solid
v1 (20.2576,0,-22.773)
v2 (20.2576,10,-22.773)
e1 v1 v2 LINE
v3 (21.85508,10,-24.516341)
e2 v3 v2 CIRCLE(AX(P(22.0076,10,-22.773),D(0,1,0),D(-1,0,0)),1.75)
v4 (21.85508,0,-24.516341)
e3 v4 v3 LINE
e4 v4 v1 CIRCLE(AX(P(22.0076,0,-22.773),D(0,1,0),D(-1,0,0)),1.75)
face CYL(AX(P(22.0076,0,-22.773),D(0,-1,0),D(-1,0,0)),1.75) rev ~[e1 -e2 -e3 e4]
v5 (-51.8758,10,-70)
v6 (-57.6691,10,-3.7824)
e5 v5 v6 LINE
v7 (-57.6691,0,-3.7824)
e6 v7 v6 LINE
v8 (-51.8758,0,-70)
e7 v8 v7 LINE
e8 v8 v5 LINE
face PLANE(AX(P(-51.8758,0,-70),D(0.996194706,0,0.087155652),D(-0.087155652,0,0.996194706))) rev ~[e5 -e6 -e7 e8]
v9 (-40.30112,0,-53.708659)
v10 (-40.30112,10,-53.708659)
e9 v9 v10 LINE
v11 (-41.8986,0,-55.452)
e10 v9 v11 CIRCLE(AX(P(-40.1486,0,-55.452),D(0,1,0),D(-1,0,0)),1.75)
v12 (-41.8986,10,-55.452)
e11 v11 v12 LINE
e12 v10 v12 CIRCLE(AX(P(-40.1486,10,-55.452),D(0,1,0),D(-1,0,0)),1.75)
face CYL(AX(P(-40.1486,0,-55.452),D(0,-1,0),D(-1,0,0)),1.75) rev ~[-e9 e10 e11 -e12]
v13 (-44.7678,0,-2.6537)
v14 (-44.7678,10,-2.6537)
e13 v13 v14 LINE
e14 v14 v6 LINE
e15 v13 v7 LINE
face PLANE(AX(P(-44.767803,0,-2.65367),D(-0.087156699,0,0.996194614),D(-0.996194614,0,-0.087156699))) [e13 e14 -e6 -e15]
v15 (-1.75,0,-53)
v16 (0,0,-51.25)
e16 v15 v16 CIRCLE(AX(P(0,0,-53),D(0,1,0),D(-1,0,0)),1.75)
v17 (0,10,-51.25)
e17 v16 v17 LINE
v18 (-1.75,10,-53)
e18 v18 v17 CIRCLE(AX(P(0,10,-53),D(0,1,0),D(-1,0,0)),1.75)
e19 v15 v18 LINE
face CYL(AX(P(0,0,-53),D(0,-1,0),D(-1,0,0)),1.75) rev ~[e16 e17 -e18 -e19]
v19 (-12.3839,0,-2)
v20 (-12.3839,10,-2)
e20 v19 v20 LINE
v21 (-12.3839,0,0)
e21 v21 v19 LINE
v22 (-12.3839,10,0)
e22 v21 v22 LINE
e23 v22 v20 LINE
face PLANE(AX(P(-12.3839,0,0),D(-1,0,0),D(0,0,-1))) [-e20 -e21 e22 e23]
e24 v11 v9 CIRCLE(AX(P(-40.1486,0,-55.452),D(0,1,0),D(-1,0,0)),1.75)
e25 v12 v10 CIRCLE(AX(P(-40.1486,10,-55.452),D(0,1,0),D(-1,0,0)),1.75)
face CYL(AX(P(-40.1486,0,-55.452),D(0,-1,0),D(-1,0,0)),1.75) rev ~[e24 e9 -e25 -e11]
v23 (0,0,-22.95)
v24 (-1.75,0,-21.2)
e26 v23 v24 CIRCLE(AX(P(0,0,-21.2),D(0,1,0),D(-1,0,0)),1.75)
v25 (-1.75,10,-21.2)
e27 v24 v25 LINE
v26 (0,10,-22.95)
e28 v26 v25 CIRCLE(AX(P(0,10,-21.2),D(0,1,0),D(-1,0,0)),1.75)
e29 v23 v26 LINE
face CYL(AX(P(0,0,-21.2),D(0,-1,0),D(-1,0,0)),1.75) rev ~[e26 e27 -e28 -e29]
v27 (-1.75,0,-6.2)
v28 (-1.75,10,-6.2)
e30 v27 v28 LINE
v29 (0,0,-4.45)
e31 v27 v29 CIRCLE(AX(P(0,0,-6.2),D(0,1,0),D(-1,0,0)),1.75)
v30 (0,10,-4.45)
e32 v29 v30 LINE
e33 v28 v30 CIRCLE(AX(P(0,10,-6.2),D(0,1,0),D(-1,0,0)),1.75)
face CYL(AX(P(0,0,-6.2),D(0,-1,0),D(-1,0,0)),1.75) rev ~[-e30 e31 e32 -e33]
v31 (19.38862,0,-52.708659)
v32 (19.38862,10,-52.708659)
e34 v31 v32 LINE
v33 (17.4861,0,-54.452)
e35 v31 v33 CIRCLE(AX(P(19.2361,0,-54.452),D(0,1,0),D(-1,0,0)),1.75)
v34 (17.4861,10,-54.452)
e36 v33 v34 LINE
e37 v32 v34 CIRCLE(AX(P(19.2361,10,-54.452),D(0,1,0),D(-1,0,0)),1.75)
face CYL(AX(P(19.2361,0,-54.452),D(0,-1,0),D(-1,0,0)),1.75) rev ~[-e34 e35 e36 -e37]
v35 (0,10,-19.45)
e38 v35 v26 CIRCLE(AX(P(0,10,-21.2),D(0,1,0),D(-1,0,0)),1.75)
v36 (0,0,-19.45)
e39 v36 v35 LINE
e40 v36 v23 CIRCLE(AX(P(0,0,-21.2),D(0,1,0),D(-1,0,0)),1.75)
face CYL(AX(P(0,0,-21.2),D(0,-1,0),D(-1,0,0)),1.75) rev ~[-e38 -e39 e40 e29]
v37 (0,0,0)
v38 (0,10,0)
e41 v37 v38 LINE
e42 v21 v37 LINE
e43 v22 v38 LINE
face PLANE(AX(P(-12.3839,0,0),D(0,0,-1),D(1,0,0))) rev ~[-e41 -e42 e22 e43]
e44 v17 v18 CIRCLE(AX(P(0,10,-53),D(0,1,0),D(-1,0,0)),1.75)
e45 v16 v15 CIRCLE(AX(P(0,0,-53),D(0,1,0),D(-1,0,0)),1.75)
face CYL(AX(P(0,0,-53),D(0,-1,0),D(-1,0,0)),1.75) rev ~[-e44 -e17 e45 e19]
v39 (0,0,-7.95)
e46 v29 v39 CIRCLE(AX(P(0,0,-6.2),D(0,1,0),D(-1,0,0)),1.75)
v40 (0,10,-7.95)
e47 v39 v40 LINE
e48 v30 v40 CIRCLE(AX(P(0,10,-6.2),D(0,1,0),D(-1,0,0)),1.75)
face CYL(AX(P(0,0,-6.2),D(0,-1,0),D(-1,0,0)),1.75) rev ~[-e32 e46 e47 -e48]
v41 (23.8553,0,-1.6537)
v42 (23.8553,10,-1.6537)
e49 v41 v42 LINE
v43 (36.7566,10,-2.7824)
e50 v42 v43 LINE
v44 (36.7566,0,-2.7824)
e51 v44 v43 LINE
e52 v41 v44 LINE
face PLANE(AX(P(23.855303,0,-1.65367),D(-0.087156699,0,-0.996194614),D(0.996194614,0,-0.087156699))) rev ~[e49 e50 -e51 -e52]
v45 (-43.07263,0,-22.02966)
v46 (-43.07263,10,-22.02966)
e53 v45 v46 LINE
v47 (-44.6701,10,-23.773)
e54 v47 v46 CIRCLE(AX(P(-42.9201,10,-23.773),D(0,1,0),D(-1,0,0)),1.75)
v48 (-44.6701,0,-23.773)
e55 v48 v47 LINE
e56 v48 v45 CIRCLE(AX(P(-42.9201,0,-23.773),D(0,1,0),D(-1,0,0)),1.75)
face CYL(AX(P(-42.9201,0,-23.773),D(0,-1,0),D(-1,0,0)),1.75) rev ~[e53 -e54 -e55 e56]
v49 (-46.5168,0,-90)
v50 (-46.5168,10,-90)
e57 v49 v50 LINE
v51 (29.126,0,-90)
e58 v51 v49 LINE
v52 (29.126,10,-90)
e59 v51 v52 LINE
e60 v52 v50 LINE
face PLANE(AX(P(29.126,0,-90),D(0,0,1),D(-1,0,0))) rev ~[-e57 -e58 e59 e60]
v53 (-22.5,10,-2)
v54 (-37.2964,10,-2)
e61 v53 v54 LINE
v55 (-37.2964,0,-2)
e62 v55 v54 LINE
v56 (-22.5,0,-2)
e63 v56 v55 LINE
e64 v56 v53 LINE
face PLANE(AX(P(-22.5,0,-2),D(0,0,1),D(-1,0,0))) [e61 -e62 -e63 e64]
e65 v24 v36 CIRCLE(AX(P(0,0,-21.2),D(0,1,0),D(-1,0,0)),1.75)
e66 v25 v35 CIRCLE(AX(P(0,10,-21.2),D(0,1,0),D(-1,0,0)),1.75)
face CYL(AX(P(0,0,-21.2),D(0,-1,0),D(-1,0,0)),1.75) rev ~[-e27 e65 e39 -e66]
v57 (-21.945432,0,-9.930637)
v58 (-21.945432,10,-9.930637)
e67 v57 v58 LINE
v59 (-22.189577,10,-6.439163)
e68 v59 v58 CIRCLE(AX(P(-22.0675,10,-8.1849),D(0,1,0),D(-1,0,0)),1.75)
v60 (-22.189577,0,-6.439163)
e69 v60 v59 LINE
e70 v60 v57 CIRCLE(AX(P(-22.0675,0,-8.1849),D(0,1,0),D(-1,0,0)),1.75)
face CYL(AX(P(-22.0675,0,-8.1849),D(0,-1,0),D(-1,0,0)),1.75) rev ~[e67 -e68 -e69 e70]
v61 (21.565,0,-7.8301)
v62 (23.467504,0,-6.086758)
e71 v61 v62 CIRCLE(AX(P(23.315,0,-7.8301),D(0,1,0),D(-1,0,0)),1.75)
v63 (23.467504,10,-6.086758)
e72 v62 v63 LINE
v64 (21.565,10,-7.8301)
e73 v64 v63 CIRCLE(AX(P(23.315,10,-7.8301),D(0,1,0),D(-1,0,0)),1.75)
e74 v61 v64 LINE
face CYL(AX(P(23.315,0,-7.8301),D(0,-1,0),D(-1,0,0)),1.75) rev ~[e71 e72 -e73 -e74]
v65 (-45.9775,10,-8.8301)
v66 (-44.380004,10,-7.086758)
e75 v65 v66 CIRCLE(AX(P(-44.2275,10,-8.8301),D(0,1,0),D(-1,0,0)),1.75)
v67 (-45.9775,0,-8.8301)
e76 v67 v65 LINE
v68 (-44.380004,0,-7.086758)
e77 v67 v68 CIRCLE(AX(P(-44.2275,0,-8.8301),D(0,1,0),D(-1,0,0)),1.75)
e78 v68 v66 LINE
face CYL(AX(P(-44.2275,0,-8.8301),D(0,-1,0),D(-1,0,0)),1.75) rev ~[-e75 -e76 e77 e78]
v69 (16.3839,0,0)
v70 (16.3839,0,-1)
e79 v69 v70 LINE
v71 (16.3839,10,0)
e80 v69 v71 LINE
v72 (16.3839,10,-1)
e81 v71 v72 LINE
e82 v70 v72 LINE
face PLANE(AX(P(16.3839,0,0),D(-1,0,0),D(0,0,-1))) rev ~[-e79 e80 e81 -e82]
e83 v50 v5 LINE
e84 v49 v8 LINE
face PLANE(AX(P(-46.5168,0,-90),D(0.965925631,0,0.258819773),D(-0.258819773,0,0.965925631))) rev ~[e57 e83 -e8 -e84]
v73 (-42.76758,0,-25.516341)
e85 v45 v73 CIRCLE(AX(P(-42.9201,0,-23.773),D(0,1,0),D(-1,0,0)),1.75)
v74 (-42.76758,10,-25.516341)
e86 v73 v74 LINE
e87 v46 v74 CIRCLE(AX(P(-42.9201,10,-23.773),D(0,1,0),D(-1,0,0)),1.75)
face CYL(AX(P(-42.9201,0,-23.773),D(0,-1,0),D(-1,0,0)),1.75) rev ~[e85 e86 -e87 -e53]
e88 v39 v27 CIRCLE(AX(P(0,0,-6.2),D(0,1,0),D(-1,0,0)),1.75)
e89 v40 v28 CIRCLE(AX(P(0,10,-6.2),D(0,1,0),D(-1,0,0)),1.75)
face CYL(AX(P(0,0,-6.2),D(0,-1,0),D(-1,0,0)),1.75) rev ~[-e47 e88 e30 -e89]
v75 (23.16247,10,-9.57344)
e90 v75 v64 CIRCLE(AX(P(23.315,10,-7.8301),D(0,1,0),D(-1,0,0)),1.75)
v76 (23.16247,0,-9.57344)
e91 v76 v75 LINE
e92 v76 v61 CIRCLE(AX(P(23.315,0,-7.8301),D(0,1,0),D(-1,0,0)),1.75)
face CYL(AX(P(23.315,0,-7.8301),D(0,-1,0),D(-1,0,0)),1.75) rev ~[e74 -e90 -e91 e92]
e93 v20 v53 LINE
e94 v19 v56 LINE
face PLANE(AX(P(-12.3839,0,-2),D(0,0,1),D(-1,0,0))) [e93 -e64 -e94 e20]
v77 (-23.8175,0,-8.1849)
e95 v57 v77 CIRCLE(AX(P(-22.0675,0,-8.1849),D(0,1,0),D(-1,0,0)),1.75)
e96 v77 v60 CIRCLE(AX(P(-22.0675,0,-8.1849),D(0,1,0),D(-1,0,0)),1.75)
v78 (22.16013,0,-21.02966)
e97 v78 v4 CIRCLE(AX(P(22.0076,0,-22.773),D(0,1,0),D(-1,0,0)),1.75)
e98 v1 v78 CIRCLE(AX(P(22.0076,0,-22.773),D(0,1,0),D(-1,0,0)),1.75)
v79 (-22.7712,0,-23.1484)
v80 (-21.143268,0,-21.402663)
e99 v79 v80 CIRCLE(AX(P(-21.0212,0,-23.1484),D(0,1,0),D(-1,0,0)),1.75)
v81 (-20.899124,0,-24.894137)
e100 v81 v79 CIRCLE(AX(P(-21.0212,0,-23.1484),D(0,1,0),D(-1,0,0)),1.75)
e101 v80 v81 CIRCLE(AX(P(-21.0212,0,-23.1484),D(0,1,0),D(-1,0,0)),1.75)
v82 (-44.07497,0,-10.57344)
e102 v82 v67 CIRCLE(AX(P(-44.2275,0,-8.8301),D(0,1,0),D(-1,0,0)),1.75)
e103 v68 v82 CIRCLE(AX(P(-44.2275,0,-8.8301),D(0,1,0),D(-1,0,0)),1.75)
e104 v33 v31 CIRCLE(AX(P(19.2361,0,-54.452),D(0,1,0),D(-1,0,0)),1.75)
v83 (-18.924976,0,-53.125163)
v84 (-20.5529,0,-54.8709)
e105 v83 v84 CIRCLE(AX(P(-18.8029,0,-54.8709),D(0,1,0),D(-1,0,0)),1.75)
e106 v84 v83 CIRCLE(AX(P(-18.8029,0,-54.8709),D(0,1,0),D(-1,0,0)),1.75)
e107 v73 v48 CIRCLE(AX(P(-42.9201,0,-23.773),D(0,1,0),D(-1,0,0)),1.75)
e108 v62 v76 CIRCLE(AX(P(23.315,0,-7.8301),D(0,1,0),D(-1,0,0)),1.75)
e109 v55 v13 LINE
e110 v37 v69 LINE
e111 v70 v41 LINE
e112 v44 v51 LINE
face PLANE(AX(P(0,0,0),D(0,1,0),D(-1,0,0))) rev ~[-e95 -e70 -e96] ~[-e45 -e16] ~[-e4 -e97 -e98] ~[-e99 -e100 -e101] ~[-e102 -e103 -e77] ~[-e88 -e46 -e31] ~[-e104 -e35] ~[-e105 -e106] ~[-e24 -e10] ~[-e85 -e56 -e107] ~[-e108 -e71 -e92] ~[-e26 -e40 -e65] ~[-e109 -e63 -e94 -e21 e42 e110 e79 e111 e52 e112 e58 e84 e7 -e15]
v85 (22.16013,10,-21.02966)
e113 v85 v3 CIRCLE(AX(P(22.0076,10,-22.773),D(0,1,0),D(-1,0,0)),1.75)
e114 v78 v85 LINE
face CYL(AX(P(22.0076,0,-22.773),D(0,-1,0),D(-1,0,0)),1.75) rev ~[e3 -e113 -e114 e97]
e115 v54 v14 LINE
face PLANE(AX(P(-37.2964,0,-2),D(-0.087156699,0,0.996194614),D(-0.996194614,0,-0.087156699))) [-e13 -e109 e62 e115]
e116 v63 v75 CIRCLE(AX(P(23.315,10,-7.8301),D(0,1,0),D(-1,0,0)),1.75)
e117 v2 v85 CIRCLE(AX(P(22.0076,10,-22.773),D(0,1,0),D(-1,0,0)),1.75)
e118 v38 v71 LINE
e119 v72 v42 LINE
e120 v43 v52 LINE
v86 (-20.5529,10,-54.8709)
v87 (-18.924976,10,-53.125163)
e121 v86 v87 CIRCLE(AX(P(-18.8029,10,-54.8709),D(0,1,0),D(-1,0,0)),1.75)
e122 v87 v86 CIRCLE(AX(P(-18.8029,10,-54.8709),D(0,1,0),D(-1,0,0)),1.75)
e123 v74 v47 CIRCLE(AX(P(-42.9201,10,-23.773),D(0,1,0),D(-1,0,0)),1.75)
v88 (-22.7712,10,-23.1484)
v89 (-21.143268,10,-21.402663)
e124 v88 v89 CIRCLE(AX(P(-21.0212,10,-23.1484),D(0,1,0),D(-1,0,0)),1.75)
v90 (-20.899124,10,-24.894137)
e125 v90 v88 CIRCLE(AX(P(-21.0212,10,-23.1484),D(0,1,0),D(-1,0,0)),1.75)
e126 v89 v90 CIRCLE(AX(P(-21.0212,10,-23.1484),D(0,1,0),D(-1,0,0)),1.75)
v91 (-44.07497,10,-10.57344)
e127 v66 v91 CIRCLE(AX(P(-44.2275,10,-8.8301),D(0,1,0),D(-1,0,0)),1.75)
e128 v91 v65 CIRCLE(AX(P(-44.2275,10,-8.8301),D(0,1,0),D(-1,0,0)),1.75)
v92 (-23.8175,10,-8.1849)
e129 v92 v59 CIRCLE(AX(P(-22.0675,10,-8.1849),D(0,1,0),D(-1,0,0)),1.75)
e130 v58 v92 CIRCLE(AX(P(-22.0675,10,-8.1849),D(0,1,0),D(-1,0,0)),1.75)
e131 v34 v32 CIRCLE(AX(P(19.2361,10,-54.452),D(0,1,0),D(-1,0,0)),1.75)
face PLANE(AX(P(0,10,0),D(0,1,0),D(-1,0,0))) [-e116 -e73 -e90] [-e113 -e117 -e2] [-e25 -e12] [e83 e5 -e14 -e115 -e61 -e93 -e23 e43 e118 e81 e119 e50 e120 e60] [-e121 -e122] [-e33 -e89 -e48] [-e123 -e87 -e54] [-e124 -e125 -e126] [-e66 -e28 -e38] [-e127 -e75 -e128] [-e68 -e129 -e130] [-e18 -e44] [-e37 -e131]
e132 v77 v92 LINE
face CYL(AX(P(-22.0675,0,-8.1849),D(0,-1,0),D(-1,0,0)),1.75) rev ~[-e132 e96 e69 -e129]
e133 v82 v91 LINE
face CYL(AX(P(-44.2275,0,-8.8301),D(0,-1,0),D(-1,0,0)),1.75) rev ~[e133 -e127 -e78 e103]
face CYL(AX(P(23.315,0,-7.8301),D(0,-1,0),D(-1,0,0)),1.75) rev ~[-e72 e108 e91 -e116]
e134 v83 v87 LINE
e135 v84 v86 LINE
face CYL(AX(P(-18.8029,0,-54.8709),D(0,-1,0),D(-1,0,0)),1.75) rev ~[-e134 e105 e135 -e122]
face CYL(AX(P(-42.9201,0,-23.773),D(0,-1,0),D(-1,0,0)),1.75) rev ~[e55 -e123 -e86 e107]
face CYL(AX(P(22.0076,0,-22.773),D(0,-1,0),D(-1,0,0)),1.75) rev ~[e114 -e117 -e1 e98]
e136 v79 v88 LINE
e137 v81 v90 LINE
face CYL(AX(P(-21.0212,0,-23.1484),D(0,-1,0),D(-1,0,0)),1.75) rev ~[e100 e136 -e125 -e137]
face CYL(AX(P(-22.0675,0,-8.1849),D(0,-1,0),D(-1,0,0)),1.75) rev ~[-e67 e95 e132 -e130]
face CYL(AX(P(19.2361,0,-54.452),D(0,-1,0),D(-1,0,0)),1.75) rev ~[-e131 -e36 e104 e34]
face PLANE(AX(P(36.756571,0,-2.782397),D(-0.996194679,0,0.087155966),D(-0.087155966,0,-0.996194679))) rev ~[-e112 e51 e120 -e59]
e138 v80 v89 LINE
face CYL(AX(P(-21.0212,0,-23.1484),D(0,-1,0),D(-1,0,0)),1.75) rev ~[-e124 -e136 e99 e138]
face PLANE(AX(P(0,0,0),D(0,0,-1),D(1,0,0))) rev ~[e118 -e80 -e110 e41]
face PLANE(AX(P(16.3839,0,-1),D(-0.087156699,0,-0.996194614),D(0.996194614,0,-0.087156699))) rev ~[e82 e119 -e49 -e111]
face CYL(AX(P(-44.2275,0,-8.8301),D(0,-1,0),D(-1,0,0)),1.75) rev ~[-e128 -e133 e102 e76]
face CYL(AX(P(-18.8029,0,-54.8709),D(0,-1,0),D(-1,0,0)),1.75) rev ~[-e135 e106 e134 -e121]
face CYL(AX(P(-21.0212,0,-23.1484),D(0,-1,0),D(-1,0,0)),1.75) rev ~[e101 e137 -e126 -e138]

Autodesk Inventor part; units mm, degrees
ref_plane "YZ Plane" through (0, 0, 0) normal (1, 0, 0) x (0, 1, 0)
ref_plane "XZ Plane" through (0, 0, 0) normal (0, 1, 0) x (-1, 0, 0)
sketch "Sketch1" plane through (0, 0, 0) normal (0, 1, 0) x (-1, 0, 0)
  line L0 (77, 0) -> (-56, 0) projected
  line L1 (0, -111.5403) -> (0, 39.2421) construction
  line L2 (58, 0) -> (-37, 0) construction
  line L3 (-37, 0) -> (-29.126, -90)
  line L4 (-29.126, -90) -> (46.5168, -90)
  line L5 (46.5168, -90) -> (51.8758, -70)
  line L6 (51.8758, -70) -> (58, 0)
  line L7 (0, -90) -> (0, -90) construction
  line L8 (-16.126, -90) -> (-24.0526, 0.6013) construction
  line L9 (37.126, -90) -> (46.4907, 17.039) construction
  circle A0 centre (44.2275, -8.8301) radius 1.75
  circle A1 centre (22.0675, -8.1849) radius 1.75
  circle A2 centre (0, -6.2) radius 1.75
  circle A3 centre (-23.315, -7.8301) radius 1.75
  circle A4 centre (42.9201, -23.773) radius 1.75
  circle A5 centre (21.0212, -23.1484) radius 1.75
  circle A6 centre (0, -21.2) radius 1.75
  circle A7 centre (-22.0076, -22.773) radius 1.75
  circle A8 centre (40.1486, -55.452) radius 1.75
  circle A9 centre (18.8029, -54.8709) radius 1.75
  circle A10 centre (0, -53) radius 1.75
  circle A11 centre (-19.2361, -54.452) radius 1.75
  line L10 (44.2275, -8.8301) -> (42.9201, -23.773)
  line L11 (22.0675, -8.1849) -> (21.0212, -23.1484)
  line L12 (0, -21.2) -> (0, -6.2)
  line L13 (-22.0076, -22.773) -> (-23.315, -7.8301)
  line L14 (42.9201, -23.773) -> (40.1486, -55.452)
  line L15 (0, -21.2) -> (0, -53)
  line L16 (-19.2361, -54.452) -> (-22.0076, -22.773)
  line L17 (21.0212, -23.1484) -> (18.8029, -54.8709)
  line L18 (12.3839, 0) -> (-16.3839, 0)
  line L19 (-16.3839, 0) -> (-16.3839, -1)
  line L20 (-16.3839, -1) -> (-36.7566, -2.7824)
  line L21 (12.3839, 0) -> (12.3839, -2)
  line L22 (12.3839, -2) -> (37.2964, -2)
  line L23 (37.2964, -2) -> (57.6691, -3.7824)
  line L24 (0, -6.2) -> (0, 0)
  line L25 (22.0675, -8.1849) -> (22.5, -2)
  line L26 (44.2275, -8.8301) -> (44.7678, -2.6537)
  line L27 (-23.315, -7.8301) -> (-23.8553, -1.6537)
  line L28 (16.3464, -90) -> (23.8777, 17.7017) construction
  point P0 (-24, 0)
  point P1 (25, 0)
  point P2 (45, 0)
  dimension "d0" = 95
  dimension "d1" = 37
  dimension "d2" = 24
  dimension "d3" = 25
  dimension "d4" = 45
  dimension "d5" = 5
  dimension "d7" = 5
  dimension "d8" = 105
  dimension "d9" = 20
  dimension "d10" = 90
  dimension "d11" = 3.5
  dimension "d12" = 31.8
  dimension "d13" = 15
  dimension "d14" = 2
  dimension "d15" = 1
  dimension "d16" = 7.5
  dimension "d18" = 7.5
  dimension "d19" = 6.2
  dimension "d22" = 4
  dimension "d23" = 22.5
extrude "Extrusion1" add sketch "Sketch1" along normal blind 10 contours L21 L22 L23 L6 L5 L4 L3 L20 L19 L0
ref_plane "Work Plane1" through (-22.5, 0, -2) normal (-0.0697565, 0, 0.9975641) x (0, -1, 0)
properties part number "empty"
